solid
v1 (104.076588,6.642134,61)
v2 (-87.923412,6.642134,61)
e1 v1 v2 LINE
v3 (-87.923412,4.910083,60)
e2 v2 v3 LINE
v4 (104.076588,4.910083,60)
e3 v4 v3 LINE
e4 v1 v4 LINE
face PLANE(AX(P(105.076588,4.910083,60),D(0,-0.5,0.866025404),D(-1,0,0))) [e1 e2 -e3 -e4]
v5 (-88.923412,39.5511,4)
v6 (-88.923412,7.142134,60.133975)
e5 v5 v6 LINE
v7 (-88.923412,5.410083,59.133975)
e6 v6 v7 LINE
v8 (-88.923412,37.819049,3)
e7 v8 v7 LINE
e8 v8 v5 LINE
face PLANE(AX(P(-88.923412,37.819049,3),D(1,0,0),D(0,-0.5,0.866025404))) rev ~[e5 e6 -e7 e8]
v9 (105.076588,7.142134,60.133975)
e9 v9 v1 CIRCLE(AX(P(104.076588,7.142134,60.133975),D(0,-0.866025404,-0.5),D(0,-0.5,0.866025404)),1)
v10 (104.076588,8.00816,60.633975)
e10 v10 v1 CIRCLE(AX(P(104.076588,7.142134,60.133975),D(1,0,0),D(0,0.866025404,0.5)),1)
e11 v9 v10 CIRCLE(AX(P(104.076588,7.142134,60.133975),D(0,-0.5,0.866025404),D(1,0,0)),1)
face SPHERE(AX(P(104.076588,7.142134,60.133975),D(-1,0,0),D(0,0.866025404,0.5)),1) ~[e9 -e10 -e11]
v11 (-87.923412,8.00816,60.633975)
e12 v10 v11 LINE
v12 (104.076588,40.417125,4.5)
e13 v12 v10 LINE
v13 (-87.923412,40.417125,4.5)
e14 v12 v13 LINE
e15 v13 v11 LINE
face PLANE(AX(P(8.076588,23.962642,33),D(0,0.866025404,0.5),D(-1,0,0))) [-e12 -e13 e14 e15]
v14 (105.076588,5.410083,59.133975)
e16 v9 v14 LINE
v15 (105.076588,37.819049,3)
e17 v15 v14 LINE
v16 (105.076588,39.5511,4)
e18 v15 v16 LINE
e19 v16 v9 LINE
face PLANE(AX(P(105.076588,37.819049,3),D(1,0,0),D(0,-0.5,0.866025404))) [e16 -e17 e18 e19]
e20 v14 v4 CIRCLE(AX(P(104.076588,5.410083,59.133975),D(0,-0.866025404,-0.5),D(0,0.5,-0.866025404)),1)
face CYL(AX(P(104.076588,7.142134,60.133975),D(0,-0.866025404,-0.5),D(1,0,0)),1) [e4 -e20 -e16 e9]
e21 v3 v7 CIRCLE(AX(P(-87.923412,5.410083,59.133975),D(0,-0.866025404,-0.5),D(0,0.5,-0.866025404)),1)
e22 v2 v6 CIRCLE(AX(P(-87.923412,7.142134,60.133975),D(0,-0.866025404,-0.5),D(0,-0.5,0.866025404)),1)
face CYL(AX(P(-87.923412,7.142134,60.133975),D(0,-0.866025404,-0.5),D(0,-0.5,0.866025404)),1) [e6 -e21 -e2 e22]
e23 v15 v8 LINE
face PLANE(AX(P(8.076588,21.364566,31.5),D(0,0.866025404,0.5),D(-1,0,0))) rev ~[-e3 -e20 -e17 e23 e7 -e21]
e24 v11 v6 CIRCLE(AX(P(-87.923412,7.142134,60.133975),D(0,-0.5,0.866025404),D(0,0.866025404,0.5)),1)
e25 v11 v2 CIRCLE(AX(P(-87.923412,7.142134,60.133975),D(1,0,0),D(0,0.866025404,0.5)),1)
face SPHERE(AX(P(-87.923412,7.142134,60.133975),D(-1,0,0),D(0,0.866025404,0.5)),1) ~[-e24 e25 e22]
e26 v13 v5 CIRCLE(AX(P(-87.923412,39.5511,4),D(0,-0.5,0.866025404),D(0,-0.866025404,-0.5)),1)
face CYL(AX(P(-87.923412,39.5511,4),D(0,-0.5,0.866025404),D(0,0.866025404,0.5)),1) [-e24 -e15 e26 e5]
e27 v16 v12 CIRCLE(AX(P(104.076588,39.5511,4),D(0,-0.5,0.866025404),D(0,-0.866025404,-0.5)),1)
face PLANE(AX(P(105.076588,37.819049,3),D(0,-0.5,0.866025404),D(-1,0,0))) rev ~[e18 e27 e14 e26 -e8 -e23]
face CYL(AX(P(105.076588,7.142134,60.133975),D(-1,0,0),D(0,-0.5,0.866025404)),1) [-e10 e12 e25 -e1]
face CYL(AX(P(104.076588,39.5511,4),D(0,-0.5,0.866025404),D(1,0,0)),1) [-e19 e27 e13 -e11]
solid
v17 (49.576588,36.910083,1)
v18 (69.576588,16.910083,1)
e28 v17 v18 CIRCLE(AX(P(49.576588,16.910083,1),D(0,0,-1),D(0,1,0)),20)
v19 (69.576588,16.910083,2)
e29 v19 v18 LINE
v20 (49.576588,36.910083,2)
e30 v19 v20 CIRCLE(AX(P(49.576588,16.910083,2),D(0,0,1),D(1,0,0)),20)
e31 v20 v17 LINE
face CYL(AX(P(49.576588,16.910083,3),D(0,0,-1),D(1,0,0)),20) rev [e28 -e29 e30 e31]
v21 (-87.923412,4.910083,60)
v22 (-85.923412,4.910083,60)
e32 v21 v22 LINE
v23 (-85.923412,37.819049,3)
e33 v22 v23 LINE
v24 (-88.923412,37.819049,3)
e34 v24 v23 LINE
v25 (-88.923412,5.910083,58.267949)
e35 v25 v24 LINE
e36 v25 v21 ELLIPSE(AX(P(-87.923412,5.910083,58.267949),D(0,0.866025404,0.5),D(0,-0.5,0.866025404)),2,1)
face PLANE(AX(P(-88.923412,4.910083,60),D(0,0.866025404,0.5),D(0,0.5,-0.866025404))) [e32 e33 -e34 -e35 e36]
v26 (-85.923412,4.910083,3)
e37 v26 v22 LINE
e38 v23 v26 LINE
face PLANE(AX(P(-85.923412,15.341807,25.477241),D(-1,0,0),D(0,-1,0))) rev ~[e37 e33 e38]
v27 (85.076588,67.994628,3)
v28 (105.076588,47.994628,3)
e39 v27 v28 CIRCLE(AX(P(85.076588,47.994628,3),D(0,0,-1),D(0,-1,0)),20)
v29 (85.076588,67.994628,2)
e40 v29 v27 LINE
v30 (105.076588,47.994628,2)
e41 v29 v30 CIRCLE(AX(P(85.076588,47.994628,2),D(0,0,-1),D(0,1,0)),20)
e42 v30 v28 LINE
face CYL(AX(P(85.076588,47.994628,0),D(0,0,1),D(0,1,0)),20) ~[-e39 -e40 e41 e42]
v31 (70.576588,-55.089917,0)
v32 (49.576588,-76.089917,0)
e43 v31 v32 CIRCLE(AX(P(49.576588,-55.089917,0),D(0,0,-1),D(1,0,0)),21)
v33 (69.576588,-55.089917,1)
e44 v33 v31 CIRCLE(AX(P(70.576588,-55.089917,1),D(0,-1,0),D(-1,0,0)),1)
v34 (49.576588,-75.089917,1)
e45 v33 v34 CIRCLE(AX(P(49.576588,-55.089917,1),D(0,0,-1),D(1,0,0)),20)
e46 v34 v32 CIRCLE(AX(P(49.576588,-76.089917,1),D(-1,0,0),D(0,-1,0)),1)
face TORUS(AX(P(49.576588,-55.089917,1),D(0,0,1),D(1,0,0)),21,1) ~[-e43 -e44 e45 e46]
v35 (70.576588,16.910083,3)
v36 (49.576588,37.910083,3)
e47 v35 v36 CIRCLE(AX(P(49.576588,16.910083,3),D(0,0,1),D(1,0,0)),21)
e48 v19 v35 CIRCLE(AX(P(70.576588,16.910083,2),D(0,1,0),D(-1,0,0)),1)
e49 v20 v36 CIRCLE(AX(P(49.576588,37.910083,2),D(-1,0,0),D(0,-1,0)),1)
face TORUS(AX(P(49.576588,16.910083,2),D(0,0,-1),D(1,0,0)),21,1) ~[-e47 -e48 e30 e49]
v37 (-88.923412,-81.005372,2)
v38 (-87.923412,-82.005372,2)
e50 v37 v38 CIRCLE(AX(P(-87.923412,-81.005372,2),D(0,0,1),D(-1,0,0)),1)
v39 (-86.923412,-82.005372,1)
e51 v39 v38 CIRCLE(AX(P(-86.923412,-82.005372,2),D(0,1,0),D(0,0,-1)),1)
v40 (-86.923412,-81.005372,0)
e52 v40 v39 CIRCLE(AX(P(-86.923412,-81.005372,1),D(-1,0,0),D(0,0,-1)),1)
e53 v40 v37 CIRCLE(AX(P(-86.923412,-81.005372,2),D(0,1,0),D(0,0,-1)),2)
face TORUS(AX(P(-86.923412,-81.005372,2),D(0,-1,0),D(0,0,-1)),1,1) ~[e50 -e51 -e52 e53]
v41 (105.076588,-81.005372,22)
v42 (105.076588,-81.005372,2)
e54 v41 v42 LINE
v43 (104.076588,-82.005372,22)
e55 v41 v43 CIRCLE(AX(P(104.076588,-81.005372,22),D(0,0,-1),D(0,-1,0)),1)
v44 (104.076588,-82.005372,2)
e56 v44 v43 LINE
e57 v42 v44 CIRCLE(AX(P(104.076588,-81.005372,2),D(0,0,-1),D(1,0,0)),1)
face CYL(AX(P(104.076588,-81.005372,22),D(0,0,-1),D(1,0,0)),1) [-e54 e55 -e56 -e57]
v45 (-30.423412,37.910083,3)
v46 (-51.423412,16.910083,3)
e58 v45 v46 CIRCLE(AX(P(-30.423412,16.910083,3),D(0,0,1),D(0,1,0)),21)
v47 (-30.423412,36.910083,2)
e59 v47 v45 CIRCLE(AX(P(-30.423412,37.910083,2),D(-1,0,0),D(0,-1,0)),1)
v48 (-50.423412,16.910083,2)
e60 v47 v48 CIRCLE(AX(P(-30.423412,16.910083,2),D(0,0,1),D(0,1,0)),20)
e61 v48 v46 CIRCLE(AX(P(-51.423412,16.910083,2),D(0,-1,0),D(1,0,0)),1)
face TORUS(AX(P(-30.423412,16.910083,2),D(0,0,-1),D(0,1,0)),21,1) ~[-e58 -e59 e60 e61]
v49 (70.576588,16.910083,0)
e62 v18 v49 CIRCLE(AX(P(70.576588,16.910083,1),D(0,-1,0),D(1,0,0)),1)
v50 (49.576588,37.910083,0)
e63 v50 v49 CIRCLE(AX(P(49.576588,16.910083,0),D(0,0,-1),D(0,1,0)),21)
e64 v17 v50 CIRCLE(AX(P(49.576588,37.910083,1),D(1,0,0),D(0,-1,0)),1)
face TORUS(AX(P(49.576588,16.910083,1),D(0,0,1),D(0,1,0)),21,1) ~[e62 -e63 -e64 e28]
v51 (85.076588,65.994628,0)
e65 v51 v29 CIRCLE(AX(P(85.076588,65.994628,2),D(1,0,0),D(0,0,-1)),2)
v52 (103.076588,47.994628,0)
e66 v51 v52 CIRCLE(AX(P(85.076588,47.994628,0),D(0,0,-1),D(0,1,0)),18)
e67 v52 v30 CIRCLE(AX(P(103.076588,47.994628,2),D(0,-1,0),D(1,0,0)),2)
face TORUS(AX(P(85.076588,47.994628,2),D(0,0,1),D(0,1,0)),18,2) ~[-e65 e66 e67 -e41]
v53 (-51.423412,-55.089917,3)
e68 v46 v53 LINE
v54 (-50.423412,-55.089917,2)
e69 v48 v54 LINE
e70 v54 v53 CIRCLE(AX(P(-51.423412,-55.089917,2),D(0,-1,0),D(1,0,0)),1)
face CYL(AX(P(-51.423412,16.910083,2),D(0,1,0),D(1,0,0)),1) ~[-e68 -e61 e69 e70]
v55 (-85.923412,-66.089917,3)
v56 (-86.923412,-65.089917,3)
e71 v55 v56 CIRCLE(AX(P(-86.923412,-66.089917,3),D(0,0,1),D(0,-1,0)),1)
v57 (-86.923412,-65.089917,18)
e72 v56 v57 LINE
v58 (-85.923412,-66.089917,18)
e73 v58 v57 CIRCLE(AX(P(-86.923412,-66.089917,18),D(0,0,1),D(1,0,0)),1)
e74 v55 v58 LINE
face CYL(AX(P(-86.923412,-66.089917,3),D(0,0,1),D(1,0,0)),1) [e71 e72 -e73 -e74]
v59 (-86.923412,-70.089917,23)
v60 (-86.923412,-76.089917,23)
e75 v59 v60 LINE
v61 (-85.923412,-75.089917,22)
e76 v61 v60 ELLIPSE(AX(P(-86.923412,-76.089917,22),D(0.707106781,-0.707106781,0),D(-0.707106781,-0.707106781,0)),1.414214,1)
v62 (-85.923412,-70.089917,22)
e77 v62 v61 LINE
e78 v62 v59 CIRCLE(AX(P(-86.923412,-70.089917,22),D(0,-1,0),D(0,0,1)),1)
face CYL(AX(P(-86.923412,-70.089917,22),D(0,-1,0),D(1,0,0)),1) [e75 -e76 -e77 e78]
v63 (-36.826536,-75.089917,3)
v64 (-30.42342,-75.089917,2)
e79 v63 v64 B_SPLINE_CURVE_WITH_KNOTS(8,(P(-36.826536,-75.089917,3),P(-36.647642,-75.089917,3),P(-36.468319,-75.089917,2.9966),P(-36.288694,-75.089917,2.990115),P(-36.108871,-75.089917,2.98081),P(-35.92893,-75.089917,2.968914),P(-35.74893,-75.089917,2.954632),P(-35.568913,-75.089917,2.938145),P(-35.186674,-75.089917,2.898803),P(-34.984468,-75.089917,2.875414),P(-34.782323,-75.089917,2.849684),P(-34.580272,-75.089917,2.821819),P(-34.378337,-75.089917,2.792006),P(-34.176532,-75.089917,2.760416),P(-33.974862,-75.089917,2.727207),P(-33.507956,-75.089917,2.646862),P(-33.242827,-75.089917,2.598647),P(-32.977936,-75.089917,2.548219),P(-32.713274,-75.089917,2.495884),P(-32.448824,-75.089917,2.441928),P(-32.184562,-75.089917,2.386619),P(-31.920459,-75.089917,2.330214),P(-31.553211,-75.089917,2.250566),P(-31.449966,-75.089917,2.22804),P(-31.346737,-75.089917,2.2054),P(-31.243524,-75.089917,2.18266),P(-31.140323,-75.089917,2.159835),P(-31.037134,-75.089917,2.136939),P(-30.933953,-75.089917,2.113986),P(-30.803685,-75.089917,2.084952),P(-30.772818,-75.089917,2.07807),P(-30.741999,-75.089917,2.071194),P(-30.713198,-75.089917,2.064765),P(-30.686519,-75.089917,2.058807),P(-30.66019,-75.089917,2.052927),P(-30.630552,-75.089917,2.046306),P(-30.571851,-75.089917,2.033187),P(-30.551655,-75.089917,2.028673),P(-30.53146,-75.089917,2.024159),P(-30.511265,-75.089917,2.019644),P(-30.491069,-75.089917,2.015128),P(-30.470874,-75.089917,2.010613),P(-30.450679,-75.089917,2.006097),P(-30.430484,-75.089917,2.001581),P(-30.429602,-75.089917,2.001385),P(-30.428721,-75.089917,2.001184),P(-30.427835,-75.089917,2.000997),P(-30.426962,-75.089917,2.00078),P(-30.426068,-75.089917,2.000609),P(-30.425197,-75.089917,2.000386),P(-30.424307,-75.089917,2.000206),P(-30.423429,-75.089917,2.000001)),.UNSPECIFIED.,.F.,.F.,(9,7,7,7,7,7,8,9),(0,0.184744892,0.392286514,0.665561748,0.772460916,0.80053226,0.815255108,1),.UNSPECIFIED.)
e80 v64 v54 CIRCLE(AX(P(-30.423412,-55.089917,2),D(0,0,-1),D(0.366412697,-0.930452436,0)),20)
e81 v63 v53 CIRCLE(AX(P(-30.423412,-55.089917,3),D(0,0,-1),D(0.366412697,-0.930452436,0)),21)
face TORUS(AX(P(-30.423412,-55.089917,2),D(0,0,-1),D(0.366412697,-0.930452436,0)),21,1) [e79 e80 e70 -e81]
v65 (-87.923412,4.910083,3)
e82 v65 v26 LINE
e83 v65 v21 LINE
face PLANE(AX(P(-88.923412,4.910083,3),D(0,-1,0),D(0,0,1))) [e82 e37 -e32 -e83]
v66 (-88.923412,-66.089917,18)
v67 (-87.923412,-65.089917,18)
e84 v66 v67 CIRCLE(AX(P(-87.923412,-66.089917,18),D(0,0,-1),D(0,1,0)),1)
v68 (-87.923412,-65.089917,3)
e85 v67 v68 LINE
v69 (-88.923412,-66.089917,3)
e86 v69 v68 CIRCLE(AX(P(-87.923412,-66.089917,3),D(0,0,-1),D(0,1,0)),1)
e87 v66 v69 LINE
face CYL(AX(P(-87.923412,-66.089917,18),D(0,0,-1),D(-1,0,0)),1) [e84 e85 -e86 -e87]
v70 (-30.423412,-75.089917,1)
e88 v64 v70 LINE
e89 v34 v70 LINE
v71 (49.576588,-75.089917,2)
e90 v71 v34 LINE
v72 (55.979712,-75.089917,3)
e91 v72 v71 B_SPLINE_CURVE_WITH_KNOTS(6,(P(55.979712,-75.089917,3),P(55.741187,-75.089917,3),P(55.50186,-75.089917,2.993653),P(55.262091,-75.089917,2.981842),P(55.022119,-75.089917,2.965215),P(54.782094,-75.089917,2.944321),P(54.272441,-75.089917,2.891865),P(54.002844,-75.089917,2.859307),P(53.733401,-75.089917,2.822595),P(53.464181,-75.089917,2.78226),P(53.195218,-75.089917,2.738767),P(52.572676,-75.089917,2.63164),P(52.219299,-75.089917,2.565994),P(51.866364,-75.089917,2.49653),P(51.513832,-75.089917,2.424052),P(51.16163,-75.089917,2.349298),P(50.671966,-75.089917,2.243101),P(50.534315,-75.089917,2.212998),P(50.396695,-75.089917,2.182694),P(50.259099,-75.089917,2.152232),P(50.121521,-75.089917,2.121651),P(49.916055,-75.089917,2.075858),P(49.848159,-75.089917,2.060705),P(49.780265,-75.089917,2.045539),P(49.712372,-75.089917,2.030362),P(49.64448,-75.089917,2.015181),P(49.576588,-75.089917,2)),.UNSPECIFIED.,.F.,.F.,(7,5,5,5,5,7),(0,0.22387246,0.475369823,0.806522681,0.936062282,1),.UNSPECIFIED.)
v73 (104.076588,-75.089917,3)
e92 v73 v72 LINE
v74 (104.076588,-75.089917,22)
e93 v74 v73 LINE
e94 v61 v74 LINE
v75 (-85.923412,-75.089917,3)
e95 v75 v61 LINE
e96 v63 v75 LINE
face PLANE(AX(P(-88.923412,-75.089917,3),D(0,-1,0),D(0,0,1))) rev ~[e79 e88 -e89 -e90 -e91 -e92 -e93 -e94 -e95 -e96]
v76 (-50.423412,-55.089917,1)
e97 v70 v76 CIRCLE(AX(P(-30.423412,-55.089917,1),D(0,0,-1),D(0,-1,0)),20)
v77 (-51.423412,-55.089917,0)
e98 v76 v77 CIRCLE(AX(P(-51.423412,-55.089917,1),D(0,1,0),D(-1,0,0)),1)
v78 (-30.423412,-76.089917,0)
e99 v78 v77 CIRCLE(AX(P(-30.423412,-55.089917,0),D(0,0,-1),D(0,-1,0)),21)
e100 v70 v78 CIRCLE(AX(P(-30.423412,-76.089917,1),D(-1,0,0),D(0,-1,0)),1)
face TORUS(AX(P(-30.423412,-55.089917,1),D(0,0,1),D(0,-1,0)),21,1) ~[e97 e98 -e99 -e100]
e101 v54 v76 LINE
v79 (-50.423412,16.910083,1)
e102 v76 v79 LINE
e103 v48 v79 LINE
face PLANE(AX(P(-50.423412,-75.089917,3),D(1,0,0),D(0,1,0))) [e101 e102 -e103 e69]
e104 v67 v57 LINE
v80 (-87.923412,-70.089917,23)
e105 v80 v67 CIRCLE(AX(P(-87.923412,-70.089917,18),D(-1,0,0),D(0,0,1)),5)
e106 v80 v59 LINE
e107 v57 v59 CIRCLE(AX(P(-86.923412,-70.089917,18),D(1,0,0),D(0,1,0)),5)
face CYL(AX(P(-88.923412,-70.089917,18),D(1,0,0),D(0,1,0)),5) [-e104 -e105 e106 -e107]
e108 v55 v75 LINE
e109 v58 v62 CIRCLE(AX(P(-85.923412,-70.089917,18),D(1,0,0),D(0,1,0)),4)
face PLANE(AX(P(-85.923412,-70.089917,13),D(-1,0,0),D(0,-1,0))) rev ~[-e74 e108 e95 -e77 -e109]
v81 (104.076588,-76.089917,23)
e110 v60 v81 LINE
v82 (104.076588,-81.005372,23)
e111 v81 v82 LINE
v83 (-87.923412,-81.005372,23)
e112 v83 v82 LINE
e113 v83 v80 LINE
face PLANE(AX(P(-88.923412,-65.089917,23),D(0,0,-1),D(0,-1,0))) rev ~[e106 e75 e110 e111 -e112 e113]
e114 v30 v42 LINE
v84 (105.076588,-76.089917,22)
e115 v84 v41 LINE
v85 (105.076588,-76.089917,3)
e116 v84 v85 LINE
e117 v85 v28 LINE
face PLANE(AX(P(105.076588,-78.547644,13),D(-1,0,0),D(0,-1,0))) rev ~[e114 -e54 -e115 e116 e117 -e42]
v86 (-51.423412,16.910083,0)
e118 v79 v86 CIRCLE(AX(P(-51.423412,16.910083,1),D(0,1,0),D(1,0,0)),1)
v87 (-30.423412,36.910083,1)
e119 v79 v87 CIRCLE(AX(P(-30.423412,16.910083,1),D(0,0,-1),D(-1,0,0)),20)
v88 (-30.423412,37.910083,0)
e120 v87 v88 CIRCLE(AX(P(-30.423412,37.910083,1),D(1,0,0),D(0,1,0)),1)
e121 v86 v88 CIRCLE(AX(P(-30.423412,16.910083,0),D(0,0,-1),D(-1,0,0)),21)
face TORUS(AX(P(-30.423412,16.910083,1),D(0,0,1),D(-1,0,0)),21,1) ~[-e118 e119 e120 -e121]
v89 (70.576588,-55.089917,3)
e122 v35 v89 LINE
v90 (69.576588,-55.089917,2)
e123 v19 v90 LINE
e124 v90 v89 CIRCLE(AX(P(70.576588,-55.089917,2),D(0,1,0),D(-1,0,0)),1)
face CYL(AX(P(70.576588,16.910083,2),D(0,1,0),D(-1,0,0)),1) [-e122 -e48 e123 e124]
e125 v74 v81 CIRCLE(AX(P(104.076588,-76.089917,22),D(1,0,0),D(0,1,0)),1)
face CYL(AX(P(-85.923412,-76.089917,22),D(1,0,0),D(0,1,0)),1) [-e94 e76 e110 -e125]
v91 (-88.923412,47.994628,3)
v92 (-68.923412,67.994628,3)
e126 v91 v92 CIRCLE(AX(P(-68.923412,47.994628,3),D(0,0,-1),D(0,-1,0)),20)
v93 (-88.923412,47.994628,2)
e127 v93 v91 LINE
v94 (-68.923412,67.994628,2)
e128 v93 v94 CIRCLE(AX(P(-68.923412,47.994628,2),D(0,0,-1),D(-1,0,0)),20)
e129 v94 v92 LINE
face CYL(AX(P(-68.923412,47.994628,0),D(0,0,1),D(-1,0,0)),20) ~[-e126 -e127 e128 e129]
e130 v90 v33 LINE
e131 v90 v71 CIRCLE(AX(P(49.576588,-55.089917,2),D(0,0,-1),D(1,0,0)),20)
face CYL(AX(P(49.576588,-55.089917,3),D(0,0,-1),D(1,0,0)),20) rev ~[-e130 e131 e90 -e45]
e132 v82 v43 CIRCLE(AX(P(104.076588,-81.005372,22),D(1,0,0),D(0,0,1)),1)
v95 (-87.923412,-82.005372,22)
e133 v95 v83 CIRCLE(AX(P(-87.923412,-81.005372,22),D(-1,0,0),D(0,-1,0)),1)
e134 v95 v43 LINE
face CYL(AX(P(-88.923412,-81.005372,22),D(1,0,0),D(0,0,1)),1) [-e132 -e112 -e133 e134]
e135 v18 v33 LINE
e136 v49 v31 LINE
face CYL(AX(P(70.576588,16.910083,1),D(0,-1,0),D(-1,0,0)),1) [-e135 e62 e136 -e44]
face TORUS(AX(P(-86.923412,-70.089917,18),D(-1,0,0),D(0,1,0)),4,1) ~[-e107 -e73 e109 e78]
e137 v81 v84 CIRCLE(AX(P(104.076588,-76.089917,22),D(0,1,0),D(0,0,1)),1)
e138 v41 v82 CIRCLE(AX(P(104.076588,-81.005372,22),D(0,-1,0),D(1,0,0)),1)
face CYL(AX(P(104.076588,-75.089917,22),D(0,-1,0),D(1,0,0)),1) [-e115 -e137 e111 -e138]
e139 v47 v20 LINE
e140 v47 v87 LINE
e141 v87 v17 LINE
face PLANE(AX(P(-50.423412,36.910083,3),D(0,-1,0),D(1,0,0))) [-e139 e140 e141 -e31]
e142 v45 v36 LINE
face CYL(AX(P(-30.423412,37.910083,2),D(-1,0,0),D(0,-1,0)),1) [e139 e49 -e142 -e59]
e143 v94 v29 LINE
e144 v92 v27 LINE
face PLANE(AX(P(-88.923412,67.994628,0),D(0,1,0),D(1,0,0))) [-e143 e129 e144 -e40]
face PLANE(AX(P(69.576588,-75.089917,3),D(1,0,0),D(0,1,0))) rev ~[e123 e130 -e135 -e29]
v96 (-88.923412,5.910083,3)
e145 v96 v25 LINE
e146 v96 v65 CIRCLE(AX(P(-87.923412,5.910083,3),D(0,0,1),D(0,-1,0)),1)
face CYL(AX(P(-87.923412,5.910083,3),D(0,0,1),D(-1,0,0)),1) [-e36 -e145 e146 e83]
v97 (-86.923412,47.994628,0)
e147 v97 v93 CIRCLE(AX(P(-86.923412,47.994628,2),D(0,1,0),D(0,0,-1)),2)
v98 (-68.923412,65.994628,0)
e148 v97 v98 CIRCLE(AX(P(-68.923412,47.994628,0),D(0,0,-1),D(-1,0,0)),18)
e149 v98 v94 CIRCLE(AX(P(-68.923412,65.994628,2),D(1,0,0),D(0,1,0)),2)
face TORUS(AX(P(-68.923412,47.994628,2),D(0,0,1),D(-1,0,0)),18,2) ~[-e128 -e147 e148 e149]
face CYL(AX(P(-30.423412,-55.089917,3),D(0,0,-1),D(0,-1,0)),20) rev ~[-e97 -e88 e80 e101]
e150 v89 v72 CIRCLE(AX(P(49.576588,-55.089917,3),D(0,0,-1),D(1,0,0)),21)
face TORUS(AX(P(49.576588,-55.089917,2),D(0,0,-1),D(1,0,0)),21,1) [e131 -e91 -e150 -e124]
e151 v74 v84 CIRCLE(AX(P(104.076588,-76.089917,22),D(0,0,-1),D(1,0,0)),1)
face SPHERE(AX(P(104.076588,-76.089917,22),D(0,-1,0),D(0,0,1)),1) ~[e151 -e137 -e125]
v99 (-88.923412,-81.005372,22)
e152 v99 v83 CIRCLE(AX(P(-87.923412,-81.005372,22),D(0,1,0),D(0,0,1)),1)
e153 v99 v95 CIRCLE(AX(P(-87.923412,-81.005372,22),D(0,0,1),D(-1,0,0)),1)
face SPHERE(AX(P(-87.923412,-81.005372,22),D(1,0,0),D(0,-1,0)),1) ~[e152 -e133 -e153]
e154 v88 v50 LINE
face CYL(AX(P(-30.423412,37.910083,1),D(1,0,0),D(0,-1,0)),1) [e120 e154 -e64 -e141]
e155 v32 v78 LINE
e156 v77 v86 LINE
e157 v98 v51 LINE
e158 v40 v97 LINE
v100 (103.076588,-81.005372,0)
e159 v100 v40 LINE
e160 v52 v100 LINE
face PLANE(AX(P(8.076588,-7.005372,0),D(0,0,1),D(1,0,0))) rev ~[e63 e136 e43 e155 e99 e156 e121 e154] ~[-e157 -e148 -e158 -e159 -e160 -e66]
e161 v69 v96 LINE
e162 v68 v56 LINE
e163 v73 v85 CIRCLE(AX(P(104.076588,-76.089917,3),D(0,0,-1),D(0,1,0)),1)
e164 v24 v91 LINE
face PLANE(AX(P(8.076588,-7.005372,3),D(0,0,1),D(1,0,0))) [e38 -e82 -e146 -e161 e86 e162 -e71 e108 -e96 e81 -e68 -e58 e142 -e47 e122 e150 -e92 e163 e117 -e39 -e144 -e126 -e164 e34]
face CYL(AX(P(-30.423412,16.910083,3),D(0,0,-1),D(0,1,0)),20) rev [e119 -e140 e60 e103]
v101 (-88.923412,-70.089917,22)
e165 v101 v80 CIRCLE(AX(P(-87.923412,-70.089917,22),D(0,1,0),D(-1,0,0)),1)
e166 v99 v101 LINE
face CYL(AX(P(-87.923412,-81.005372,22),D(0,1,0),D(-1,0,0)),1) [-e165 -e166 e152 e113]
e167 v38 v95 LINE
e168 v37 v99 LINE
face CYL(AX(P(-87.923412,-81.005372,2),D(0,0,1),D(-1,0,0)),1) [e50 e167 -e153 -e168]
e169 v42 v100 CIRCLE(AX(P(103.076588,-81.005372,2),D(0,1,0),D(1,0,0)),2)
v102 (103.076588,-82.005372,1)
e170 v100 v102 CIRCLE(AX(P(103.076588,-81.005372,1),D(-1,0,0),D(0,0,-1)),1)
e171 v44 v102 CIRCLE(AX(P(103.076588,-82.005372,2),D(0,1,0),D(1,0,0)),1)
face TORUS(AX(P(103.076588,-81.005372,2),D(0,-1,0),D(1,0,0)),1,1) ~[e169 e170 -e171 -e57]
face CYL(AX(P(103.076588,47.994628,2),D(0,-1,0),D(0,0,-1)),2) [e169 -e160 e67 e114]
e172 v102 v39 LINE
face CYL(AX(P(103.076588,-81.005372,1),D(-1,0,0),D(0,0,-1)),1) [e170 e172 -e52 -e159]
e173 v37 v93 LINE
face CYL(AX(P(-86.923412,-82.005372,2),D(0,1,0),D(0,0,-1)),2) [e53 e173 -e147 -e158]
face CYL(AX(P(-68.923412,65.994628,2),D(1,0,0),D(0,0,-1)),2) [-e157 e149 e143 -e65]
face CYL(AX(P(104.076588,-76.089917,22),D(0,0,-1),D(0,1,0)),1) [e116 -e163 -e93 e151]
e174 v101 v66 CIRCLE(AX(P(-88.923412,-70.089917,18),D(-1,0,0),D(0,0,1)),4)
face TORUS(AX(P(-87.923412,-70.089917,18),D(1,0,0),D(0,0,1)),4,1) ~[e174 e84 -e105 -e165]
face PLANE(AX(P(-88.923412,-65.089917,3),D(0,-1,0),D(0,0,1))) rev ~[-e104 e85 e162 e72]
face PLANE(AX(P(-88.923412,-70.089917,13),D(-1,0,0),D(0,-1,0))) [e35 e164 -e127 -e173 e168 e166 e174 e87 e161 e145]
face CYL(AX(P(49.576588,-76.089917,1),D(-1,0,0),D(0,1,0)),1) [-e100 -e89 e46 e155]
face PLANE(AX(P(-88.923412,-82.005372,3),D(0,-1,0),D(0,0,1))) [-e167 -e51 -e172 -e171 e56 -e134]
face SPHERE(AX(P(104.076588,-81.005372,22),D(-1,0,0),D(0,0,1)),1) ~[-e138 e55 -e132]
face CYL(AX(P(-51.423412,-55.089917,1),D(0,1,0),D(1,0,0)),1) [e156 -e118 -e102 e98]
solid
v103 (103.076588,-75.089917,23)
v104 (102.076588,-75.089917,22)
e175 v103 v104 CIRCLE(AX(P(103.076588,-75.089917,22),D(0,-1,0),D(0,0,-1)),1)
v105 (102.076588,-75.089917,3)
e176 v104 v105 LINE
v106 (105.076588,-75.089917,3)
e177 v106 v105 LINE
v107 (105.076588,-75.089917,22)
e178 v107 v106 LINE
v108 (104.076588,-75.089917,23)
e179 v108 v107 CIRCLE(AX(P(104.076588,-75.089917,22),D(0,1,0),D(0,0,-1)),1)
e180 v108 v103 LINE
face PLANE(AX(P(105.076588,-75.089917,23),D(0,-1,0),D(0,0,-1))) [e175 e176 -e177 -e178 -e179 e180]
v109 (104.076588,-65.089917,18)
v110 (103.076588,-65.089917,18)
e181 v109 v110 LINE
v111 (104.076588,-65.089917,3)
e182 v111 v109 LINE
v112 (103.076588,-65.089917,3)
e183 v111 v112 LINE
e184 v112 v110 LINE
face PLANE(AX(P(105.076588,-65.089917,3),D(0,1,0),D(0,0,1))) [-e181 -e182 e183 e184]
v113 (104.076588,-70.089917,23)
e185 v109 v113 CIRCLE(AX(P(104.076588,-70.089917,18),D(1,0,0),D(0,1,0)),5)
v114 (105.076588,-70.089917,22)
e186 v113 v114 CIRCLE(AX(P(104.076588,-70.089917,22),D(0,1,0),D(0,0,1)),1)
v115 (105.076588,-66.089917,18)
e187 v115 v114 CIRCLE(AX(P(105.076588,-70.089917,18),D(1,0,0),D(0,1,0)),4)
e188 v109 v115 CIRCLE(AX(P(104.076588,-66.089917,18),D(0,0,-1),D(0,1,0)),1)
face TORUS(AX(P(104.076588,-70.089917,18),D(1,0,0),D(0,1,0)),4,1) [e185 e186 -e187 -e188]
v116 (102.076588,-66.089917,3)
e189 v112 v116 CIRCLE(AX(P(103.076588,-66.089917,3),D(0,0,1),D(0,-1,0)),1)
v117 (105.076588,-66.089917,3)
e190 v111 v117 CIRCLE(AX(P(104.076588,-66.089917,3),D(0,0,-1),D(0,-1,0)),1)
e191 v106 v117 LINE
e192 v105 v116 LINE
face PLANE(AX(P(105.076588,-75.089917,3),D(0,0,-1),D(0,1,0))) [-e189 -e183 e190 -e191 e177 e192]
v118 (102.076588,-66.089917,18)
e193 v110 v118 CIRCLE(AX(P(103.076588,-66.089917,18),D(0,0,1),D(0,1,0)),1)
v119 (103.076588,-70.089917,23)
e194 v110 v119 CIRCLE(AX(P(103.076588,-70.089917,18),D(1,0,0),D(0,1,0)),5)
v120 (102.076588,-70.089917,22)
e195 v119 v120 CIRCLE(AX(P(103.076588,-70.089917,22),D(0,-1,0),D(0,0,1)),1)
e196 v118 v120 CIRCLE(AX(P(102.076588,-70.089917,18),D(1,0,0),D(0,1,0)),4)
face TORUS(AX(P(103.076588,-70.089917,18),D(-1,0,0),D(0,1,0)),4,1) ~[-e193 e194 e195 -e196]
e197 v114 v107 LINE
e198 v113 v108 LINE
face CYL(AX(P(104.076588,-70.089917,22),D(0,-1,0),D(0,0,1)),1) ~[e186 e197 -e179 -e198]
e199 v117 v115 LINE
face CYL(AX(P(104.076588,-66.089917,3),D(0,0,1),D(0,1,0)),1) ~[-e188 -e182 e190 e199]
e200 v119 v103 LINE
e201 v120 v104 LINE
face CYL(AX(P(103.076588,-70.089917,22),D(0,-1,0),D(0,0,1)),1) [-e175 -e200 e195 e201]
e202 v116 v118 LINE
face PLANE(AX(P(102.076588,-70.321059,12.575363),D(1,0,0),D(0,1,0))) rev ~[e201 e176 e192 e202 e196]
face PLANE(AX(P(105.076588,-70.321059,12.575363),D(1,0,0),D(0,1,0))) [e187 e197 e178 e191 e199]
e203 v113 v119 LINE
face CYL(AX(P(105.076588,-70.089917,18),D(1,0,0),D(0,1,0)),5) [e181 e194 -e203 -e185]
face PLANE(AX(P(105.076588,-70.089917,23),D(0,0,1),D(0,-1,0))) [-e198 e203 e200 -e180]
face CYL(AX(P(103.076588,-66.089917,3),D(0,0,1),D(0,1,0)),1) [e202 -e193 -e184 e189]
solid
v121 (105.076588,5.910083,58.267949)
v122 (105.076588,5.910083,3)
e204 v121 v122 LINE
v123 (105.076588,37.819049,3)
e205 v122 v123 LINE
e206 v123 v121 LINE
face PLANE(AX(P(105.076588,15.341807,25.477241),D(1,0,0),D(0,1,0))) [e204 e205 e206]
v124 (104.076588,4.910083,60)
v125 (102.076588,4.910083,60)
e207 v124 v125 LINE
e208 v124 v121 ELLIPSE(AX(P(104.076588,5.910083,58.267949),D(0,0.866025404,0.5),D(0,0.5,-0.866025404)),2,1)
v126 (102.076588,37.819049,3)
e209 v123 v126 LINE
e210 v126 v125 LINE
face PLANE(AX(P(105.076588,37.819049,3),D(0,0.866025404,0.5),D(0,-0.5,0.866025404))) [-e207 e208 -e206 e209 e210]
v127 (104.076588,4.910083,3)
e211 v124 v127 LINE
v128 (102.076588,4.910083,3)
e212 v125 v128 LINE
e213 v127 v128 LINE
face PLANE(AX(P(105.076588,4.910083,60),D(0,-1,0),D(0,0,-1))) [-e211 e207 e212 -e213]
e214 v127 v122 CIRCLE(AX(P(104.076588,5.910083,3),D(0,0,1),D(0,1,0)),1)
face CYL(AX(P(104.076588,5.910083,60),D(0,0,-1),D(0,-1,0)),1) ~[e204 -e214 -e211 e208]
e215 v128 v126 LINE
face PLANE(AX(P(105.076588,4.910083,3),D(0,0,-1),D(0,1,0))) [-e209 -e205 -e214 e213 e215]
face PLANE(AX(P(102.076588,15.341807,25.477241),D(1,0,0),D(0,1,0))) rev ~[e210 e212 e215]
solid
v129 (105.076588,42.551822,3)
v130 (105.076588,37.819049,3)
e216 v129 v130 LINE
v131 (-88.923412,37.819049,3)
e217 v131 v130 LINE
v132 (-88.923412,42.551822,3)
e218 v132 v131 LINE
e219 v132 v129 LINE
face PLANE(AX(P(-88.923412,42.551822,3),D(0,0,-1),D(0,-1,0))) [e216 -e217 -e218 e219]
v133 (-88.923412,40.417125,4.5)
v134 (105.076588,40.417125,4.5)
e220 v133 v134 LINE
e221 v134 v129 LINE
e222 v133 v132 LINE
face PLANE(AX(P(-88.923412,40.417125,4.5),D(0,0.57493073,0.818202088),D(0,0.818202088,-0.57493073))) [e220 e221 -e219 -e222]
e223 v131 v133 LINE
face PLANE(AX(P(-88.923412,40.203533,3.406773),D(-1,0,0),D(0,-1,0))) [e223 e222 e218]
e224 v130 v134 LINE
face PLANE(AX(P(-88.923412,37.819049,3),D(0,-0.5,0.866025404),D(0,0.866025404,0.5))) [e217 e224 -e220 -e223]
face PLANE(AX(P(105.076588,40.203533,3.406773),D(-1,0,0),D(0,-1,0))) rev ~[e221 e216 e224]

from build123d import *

# Parameters (mm, degrees)
F0_W          = 194
F0_H          = 150
F1_DEPTH      = 3
F2_W          = 6.9154556079
F2_H          = 20
F3_DEPTH      = 194
F5_DEPTH      = 3
F7_DEPTH      = 3
F8_W          = 194
F8_H          = 65.8179306876
F9_DEPTH      = 3
F11_DEPTH     = 194
F12_W         = 10
F12_H         = 20
F13_DEPTH     = 3
F14_R         = 5
F15_R         = 1
F16_R         = 1
F18_DEPTH     = 3
F19_R         = 1
F20_R         = 1
F21_R         = 1
F22_W         = 120
F22_H         = 112
F23_DEPTH     = 3.001
F24_R         = 20
F25_R         = 20
F26_R         = 2
F27_R         = 1
F28_R         = 1
F29_R         = 1
F30_T1_DEPTH  = 72
F30_T3_DEPTH  = 80
F30_T6_ANGLE  = 90
F30_T8_ANGLE  = 90
F30_T12_ANGLE = 111.4945483856
F30_T17_ANGLE = 111.4945483856
F31_R         = 1
F31_2_R       = 1


# Not quite as in the source:
# - a fillet or chamfer that OpenCascade refuses, or shapes differently, is made with other operations: its cross-section is extruded or revolved along the edge and cut away or added


with BuildPart() as f1:
    # F0 (on Top) → F1 (new body)
    with BuildSketch(Plane.XY):
        with Locations((8.0765881836, -7.0053721947)):
            Rectangle(F0_W, F0_H)
    extrude(amount=F1_DEPTH)

    # F2 (on face) → F3 (join)
    with BuildSketch(Plane(origin=(-88.9234118164, 0, 0), x_dir=(0, -1, 0), z_dir=(-1, 0, 0))):
        with Locations((78.5476443908, 13)):
            Rectangle(F2_W, F2_H)
    extrude(amount=-F3_DEPTH)

    # F4 (on face) → F5 (join)
    with BuildSketch(Plane(origin=(-88.9234118164, 0, 0), x_dir=(0, -1, 0), z_dir=(-1, 0, 0))):
        Polygon((-4.9100834131, 60), (-37.8190487569, 3), (-4.9100834131, 3), align=None)
    extrude(amount=-F5_DEPTH)

    # F12 (on face) → F13 (join)
    with BuildSketch(Plane(origin=(-88.9234118164, 0, 0), x_dir=(0, -1, 0), z_dir=(-1, 0, 0))):
        with Locations((70.0899165869, 13)):
            Rectangle(F12_W, F12_H)
    extrude(amount=-F13_DEPTH)

    # F14
    f14_edges = [f1.edges().sort_by_distance(p)[0] for p in [
        (-87.423412, -65.089917, 23),
    ]]
    fillet(f14_edges, radius=F14_R)

    # F21
    f21_edges = [f1.edges().sort_by_distance(p)[0] for p in [
        (8.076588, -82.005372, 23),
    ]]
    fillet(f21_edges, radius=F21_R)

    # F22 (on face) → F23 (cut, through all)
    with BuildSketch(Plane.XY.offset(3)):
        with Locations((9.5765881836, -19.0899165869)):
            Rectangle(F22_W, F22_H)
    extrude(amount=-F23_DEPTH, mode=Mode.SUBTRACT)

    # F24
    f24_edges = [f1.edges().sort_by_distance(p)[0] for p in [
        (-88.923412, 67.994628, 1.5),
        (105.076588, 67.994628, 1.5),
        (69.576588, 36.910083, 1.5),
        (-50.423412, 36.910083, 1.5),
    ]]
    fillet(f24_edges, radius=F24_R)

    # F25
    f25_edges = [f1.edges().sort_by_distance(p)[0] for p in [
        (69.576588, -75.089917, 1.5),
        (-50.423412, -75.089917, 1.5),
    ]]
    fillet(f25_edges, radius=F25_R)

    # F26
    f26_edges = [f1.edges().sort_by_distance(p)[0] for p in [
        (-88.923412, -17.005372, 0),
        (105.076588, -17.005372, 0),
        (99.218724, 62.136763, 0),
        (8.076588, 67.994628, 0),
        (-83.065547, 62.136763, 0),
    ]]
    fillet(f26_edges, radius=F26_R)

    # F27
    f27_edges = [f1.edges().sort_by_distance(p)[0] for p in [
        (-88.923412, 4.910083, 31.5),
    ]]
    fillet(f27_edges, radius=F27_R)

    # F28
    f28_edges = [f1.edges().sort_by_distance(p)[0] for p in [
        (-88.923412, -82.005372, 12),
        (-88.337625, -82.005372, 0.585786),
        (8.076588, -82.005372, 22),
        (8.076588, -82.005372, 0),
        (105.076588, -82.005372, 12),
        (104.490802, -82.005372, 0.585786),
    ]]
    fillet(f28_edges, radius=F28_R)

    # F29
    f29_edges = [f1.edges().sort_by_distance(p)[0] for p in [
        (-44.565547, -69.232052, 0),
        (63.718724, -69.232052, 0),
        (9.576588, -75.089917, 0),
        (63.718724, 31.052219, 0),
        (69.576588, -19.089917, 0),
        (9.576588, 36.910083, 0),
        (-44.565547, 31.052219, 0),
        (-50.423412, -19.089917, 0),
    ]]
    fillet(f29_edges, radius=F29_R)

    # F30: fillet of radius 1 on 6 edges, made by hand

    # F30_s2 → F30_t1 (cut)
    with BuildSketch(Plane.XZ.offset(-16.9100834131)):
        with BuildLine():
            ThreePointArc((-50.4234118164, 2), (-50.7163050352, 2.7071067812), (-51.4234118164, 3))
            Line((-51.4234118164, 3), (-50.4234118164, 3))
            Line((-50.4234118164, 3), (-50.4234118164, 2))
        make_face()
        with BuildLine():
            ThreePointArc((69.5765881836, 2), (69.8694814025, 2.7071067812), (70.5765881836, 3))
            Line((70.5765881836, 3), (69.5765881836, 3))
            Line((69.5765881836, 3), (69.5765881836, 2))
        make_face()
    extrude(amount=F30_T1_DEPTH, mode=Mode.SUBTRACT)

    # F30_s4 → F30_t3 (cut)
    with BuildSketch(Plane.YZ.offset(-30.4234118164)):
        with BuildLine():
            ThreePointArc((36.9100834131, 2), (37.2029766319, 2.7071067812), (37.9100834131, 3))
            Line((37.9100834131, 3), (36.9100834131, 3))
            Line((36.9100834131, 3), (36.9100834131, 2))
        make_face()
    extrude(amount=F30_T3_DEPTH, mode=Mode.SUBTRACT)

    # F30_s5 → F30_t6 (revolve, cut)
    with BuildSketch(Plane.YZ.offset(-30.4234118164)):
        with BuildLine():
            ThreePointArc((36.9100834131, 2), (37.2029766319, 2.7071067812), (37.9100834131, 3))
            Line((37.9100834131, 3), (36.9100834131, 3))
            Line((36.9100834131, 3), (36.9100834131, 2))
        make_face()
    revolve(axis=Axis((-30.4234118164, 16.9100834131, 3), (0, 0, 1)), revolution_arc=F30_T6_ANGLE, mode=Mode.SUBTRACT)

    # F30_s7 → F30_t8 (revolve, cut)
    with BuildSketch(Plane.XZ.offset(-16.9100834131)):
        with BuildLine():
            ThreePointArc((69.5765881836, 2), (69.8694814025, 2.7071067812), (70.5765881836, 3))
            Line((70.5765881836, 3), (69.5765881836, 3))
            Line((69.5765881836, 3), (69.5765881836, 2))
        make_face()
    revolve(axis=Axis((49.5765881836, 16.9100834131, 3), (0, 0, 1)), revolution_arc=F30_T8_ANGLE, mode=Mode.SUBTRACT)


with BuildPart() as f7:
    # F6 (on face) → F7 (new body)
    with BuildSketch(Plane.YZ.offset(105.0765881836)):
        Polygon((4.9100834131, 3), (37.8190487569, 3), (4.9100834131, 60), align=None)
    extrude(amount=-F7_DEPTH)

    # F20
    f20_edges = [f7.edges().sort_by_distance(p)[0] for p in [
        (105.076588, 4.910083, 31.5),
    ]]
    fillet(f20_edges, radius=F20_R)


with BuildPart() as f9:
    # F8 (on face) → F9 (new body)
    with BuildSketch(Plane(origin=(0, 29.6633246734, 17.1261284852), x_dir=(-1, 0, 0), z_dir=(0, 0.8660254038, 0.5))):
        with Locations((-8.0765881836, 16.5975171767)):
            Rectangle(F8_W, F8_H)
    extrude(amount=F9_DEPTH)

    # F15
    f15_edges = [f9.edges().sort_by_distance(p)[0] for p in [
        (8.076588, 7.50816, 61.5),
    ]]
    fillet(f15_edges, radius=F15_R)

    # F16
    f16_edges = [f9.edges().sort_by_distance(p)[0] for p in [
        (-88.923412, 24.212642, 32.566987),
    ]]
    fillet(f16_edges, radius=F16_R)

    # F19
    f19_edges = [f9.edges().sort_by_distance(p)[0] for p in [
        (105.076588, 24.212642, 32.566987),
    ]]
    fillet(f19_edges, radius=F19_R)


with BuildPart() as f11:
    # F10 (on face) → F11 (new body)
    with BuildSketch(Plane(origin=(-88.9234118164, 0, 0), x_dir=(0, -1, 0), z_dir=(-1, 0, 0))):
        Polygon((-37.8190487569, 3), (-40.4171249683, 4.5), (-42.5518223643, 3), align=None)
    extrude(amount=-F11_DEPTH)


with BuildPart() as f18:
    # F17 (on face) → F18 (new body)
    with BuildSketch(Plane.YZ.offset(105.0765881836)):
        with BuildLine():
            Line((-65.0899165869, 3), (-65.0899165869, 18))
            ThreePointArc((-65.0899165869, 18), (-66.5543826809, 21.5355339059), (-70.0899165869, 23))
            Line((-70.0899165869, 23), (-75.0899165869, 23))
            Line((-75.0899165869, 23), (-75.0899165869, 3))
            Line((-75.0899165869, 3), (-65.0899165869, 3))
        make_face()
    extrude(amount=-F18_DEPTH)

    # F31#2
    f31_2_edges = [f18.edges().sort_by_distance(p)[0] for p in [
        (105.076588, -65.089917, 10.5),
        (105.076588, -66.554383, 21.535534),
        (102.076588, -65.089917, 10.5),
        (102.076588, -66.554383, 21.535534),
        (105.076588, -72.589917, 23),
        (102.076588, -72.589917, 23),
    ]]
    fillet(f31_2_edges, radius=F31_2_R)


with BuildPart() as f30_tool10:
    # F30_s11 → F30_t12 (revolve)
    with BuildSketch(Plane.XZ.offset(55.0899165869)):
        with BuildLine():
            ThreePointArc((69.5765881836, 2), (69.8694814025, 2.7071067812), (70.5765881836, 3))
            Line((70.5765881836, 3), (69.5765881836, 3))
            Line((69.5765881836, 3), (69.5765881836, 2))
        make_face()
    revolve(axis=Axis((49.5765881836, -55.0899165869, 3), (0, 0, -1)), revolution_arc=F30_T12_ANGLE)

    split(bisect_by=Plane.XZ.offset(75.0899165869), keep=Keep.BOTTOM)


with BuildPart() as f1_1:
    add(f1.part)

    # F30_t9: cut F30_tool10
    add(f30_tool10.part, mode=Mode.SUBTRACT)


with BuildPart() as f30_tool15:
    # F30_s16 → F30_t17 (revolve)
    with BuildSketch(Plane(origin=(-45.1205998281, -17.7685178107, 0), x_dir=(0, 0, 1), z_dir=(0.9304524359, 0.3664126971, 0))):
        with BuildLine():
            ThreePointArc((2, 60.1110227003), (2.7071067812, 60.4039159191), (3, 61.1110227003))
            Line((3, 61.1110227003), (3, 60.1110227003))
            Line((3, 60.1110227003), (2, 60.1110227003))
        make_face()
    revolve(axis=Axis((-30.4234118164, -55.0899165869, 3), (0, 0, -1)), revolution_arc=F30_T17_ANGLE)

    split(bisect_by=Plane.XZ.offset(75.0899165869), keep=Keep.BOTTOM)


with BuildPart() as f1_2:
    add(f1_1.part)

    # F30_t14: cut F30_tool15
    add(f30_tool15.part, mode=Mode.SUBTRACT)

    # F31
    f31_edges = [f1_2.edges().sort_by_distance(p)[0] for p in [
        (-85.923412, -65.089917, 10.5),
        (9.076588, -75.089917, 23),
        (-85.923412, -72.589917, 23),
        (-85.923412, -66.554383, 21.535534),
    ]]
    fillet(f31_edges, radius=F31_R)


solid = Compound([f7.part, f9.part, f11.part, f18.part, f1_2.part])
